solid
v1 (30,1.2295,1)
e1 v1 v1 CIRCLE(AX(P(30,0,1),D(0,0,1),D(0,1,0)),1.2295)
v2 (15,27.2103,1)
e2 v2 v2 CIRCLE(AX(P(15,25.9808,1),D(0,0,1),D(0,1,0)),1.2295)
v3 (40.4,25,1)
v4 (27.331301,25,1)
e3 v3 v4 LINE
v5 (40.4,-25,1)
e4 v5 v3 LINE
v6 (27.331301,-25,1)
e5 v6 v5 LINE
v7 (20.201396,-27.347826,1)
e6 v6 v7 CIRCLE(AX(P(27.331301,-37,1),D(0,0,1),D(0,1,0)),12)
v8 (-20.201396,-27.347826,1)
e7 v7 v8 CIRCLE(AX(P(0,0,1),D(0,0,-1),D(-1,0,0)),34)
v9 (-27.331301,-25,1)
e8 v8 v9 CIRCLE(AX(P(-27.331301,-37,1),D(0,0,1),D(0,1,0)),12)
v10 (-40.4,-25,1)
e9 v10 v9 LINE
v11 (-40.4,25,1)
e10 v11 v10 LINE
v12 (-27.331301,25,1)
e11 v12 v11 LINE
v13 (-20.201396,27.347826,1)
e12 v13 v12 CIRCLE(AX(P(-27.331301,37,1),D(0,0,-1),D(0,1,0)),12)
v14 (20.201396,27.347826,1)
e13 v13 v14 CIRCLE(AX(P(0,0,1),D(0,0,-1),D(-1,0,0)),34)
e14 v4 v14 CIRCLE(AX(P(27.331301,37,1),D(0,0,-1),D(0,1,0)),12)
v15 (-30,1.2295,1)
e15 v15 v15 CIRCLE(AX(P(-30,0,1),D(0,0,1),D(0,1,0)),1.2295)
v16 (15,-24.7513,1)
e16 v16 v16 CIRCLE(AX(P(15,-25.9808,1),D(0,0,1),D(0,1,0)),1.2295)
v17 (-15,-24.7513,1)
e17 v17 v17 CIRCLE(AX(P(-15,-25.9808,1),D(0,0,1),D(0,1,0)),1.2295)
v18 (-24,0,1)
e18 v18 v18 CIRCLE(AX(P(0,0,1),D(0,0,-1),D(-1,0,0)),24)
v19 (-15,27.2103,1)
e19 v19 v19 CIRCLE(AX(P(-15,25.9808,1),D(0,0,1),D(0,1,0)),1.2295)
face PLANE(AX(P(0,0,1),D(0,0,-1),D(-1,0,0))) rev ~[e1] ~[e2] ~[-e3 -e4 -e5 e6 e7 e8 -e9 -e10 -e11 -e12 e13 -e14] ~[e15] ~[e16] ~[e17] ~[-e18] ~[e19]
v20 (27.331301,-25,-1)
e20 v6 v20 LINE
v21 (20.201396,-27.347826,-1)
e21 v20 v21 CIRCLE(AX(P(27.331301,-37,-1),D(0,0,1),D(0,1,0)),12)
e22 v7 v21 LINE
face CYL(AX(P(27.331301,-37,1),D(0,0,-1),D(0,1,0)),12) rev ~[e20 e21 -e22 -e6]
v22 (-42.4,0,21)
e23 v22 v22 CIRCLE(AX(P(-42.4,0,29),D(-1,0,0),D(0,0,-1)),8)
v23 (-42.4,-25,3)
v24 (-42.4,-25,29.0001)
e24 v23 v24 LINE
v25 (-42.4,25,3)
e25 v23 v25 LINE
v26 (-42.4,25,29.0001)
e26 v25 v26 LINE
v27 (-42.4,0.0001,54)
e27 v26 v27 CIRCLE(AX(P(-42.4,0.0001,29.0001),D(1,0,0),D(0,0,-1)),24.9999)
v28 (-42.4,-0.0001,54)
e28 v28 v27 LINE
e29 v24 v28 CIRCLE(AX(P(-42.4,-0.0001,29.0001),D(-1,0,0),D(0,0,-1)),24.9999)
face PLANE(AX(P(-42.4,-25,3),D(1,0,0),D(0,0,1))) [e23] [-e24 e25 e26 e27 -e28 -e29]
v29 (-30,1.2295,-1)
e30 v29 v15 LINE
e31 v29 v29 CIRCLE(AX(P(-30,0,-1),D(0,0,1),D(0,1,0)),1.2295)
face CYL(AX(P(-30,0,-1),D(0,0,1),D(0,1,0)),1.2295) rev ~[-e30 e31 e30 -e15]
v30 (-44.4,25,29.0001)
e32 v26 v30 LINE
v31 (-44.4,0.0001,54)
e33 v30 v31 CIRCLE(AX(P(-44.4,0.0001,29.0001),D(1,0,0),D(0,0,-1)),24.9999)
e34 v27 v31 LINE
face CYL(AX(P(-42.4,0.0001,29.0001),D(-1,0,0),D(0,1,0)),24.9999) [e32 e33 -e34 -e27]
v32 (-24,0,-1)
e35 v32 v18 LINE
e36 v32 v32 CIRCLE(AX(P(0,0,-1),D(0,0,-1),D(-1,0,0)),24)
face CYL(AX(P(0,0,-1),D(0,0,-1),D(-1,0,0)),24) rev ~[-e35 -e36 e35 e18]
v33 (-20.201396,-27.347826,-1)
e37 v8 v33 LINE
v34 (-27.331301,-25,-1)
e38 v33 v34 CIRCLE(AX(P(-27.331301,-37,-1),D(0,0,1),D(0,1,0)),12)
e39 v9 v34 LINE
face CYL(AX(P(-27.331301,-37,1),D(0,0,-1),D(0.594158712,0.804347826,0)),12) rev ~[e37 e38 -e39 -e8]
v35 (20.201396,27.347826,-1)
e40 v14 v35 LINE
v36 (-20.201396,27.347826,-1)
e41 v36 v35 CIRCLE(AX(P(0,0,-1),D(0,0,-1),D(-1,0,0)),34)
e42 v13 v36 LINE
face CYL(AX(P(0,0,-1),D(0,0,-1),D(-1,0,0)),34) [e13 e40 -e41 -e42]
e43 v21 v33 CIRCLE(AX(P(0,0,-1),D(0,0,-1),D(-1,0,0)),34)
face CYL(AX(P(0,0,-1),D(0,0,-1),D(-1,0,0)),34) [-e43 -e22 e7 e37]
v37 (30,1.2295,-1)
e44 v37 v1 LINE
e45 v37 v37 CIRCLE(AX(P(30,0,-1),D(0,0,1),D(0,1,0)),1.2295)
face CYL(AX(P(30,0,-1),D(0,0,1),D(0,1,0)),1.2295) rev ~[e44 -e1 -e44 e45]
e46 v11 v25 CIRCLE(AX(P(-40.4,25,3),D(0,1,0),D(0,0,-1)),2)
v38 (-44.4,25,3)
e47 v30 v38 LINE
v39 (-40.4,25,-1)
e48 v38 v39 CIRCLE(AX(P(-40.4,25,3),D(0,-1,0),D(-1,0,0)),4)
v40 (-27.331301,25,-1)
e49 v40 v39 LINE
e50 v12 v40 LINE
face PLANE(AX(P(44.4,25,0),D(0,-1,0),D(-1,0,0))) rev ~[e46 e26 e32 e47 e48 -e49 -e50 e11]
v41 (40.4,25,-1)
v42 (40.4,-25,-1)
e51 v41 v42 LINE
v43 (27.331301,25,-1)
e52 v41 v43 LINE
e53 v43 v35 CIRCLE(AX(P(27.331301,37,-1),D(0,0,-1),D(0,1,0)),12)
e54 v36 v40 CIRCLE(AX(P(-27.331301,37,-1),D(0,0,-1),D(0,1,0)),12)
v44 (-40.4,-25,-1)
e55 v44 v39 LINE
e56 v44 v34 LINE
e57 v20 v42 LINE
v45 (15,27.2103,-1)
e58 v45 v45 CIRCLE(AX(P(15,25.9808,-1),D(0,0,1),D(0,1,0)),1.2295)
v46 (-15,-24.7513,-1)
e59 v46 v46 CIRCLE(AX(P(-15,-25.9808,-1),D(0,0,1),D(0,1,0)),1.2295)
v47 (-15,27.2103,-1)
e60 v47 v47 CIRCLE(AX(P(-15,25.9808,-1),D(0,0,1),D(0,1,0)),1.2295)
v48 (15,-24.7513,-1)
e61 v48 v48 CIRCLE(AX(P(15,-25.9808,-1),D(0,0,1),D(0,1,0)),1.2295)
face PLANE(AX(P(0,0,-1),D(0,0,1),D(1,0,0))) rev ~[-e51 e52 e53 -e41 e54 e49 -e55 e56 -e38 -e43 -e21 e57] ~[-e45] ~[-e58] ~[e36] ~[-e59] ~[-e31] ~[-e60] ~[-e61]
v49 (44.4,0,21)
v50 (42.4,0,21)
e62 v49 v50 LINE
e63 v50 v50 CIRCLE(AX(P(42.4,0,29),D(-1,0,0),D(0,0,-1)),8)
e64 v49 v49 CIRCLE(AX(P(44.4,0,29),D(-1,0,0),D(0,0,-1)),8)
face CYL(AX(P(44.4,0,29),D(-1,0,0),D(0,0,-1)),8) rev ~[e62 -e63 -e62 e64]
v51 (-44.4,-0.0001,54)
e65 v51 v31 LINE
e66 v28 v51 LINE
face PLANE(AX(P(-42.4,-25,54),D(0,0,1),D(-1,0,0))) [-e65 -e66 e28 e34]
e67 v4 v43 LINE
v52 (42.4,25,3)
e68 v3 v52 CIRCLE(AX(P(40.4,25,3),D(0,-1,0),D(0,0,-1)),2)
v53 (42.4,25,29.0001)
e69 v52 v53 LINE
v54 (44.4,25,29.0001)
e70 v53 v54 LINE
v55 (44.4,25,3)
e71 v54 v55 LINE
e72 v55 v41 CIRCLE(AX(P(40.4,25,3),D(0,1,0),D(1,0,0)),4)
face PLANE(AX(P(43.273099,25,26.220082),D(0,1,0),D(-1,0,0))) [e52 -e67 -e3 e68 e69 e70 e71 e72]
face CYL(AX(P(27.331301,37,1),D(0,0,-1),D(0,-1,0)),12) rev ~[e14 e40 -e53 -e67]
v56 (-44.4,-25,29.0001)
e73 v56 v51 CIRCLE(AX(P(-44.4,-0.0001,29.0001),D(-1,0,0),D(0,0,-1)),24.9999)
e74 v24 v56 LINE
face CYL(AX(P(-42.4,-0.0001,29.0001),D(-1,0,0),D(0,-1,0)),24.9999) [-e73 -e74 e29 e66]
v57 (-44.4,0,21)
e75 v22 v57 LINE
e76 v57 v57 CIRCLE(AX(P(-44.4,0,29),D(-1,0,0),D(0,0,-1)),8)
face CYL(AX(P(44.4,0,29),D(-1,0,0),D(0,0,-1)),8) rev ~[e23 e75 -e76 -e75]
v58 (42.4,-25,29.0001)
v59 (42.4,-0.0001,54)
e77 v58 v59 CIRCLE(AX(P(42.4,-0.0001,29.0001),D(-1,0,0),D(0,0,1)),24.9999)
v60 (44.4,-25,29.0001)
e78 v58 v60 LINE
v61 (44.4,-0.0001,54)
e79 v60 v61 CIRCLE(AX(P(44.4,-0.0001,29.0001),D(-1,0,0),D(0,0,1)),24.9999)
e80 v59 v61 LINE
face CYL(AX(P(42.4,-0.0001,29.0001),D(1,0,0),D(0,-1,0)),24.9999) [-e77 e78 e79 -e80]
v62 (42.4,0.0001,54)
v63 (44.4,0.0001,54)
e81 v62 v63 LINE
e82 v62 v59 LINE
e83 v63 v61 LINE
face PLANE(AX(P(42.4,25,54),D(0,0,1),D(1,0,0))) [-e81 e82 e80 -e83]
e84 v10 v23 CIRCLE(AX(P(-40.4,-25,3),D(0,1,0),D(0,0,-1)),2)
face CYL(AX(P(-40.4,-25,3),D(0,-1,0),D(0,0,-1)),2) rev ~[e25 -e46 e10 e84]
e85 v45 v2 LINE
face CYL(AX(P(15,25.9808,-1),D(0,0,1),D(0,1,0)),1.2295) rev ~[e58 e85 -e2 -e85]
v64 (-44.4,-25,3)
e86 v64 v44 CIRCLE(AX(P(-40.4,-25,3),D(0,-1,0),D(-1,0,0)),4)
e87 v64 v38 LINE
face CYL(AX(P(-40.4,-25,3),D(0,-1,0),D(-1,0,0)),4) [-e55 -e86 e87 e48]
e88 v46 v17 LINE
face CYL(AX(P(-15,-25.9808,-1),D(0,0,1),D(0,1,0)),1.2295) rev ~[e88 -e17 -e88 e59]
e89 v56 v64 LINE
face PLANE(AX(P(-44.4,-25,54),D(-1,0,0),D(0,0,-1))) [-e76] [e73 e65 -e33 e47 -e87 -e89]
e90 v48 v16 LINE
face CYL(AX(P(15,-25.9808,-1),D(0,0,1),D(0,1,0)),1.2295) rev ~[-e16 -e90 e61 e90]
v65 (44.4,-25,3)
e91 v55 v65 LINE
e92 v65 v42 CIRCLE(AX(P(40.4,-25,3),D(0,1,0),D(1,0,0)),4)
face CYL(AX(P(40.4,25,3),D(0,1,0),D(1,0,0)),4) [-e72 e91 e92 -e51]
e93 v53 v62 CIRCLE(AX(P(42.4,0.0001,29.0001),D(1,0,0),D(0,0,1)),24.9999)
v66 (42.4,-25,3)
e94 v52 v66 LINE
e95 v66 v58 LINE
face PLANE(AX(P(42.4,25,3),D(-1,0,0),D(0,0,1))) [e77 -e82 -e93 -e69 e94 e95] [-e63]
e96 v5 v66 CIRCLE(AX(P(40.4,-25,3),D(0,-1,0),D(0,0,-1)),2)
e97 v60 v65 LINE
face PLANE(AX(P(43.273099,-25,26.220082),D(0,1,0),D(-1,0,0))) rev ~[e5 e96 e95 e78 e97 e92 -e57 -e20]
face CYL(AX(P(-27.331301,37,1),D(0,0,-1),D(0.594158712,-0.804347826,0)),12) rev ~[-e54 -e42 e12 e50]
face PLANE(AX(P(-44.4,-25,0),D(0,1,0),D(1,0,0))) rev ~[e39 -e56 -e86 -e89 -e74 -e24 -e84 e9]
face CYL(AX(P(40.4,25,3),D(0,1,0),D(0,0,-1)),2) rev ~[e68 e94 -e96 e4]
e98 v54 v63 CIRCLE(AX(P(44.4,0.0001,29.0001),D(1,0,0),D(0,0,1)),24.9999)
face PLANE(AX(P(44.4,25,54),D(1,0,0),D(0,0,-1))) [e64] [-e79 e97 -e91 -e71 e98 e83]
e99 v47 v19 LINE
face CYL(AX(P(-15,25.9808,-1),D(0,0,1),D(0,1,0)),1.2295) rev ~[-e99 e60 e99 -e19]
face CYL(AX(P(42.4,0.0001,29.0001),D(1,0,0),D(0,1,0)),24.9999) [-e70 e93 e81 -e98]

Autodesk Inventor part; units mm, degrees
ref_plane "YZ Plane" through (0, 0, 0) normal (1, 0, 0) x (0, 1, 0)
ref_plane "XZ Plane" through (0, 0, 0) normal (0, 1, 0) x (-1, 0, 0)
ref_plane "XY Plane" through (0, 0, 0) normal (0, 0, 1) x (1, 0, 0)
sketch "スケッチ1" plane through (0, 0, 0) normal (0, 0, 1) x (1, 0, 0)
  line L0 (44.4, 25) -> (-44.4, 25)
  line L1 (-44.4, 25) -> (-44.4, -25)
  line L2 (-44.4, -25) -> (44.4, -25)
  line L3 (44.4, -25) -> (44.4, 25)
  line L4 (44.4, 25) -> (-44.4, -25) construction
  line L5 (-44.4, 25) -> (44.4, -25) construction
  point P0 (0, 0)
  dimension "d0" = 50
  dimension "d1" = 88.8
extrude "プレート1" add sketch "スケッチ1" along normal mid plane 2
sketch "スケッチ6" plane through (0, 0, -1) normal (0, 0, -1) x (-1, 0, 0)
  circle A0 centre (0, 0) radius 34
  dimension "d48" = 68
extrude "押し出し2" add sketch "スケッチ6" against normal up to surface (2 mm away)
sketch "スケッチ2" plane through (42.4, 25, -1) normal (1, 0, 0) x (0, 1, 0)
  line L0 (-50, 0) -> (0, 0)
  line L1 (0, 0) -> (0, 55)
  line L2 (0, 55) -> (-50, 55)
  line L3 (-50, 55) -> (-50, 0)
edge flange "フランジ1" height 55 angle 90 thickness 2 bend radius 2 thickness toward (1, 0, 0) relief tear relief width 2 relief depth 1 corner gap 2 corner form 0 edges at (44.4, 0, 1) (-44.4, 0, 1) wall of the first edge with corners at (42.4, -25, -1) (42.4, 25, -1) (42.4, 25, 54) (42.4, -25, 54)
bend "曲げ1"
corner "コーナー1"
fillet "フィレット1" radius 25 4 edges at (43.4, 25, 54) (-43.4, 25, 54) (-43.4, -25, 54) (43.4, -25, 54)
sketch "スケッチ3" plane through (44.4, -25, 3) normal (1, 0, 0) x (0, 0, -1)
  arc A0 (-26, 50) -> (-26, 0) centre (-26, 25) ccw projected
  point P0 (3, 25)
  point P1 (-26, 25)
  point P2 (-38, 25)
  point P3 (-26, 13)
  point P4 (-14, 25)
  point P5 (-26, 37)
  dimension "d24" = 360
  dimension "d52" = 12
hole "穴1" at (44.4, 0, 29) direction (-1, 0, 0) diameter 16 end through all
sketch "スケッチ4" plane through (0, 0, -1) normal (0, 0, -1) x (-1, 0, 0)
  circle A0 centre (0, 0) radius 24
  dimension "d33" = 48
extrude "押し出し1" cut sketch "スケッチ4" against normal through all
sketch "スケッチ5" plane through (0, 0, -1) normal (0, 0, -1) x (-1, 0, 0)
  point P0 (0, 0)
  point P1 (-30, 0)
  point P2 (-15, -25.9808)
  point P3 (15, -25.9808)
  point P4 (30, 0)
  point P5 (15, 25.9808)
  point P6 (-15, 25.9808)
  dimension "d36" = 30
  dimension "d39" = 360
hole "穴3" at (30, 0, -1) at (15, -25.9808, -1) at (-15, -25.9808, -1) at (-30, 0, -1) at (-15, 25.9808, -1) at (15, 25.9808, -1) direction (0, 0, 1) diameter 2.459 end through all thread size "M3x0.5" class "6H" standard "ANSI Metric M Profile"
fillet "コーナーR1" radius 12 4 edges at (23.0434, 25, 0) (-23.0434, 25, 0) (23.0434, -25, 0) (-23.0434, -25, 0)
equation "\"d13\" = 0.5 * d0"
equation "\"d46\" = Thickness"
equation "\"d2\" = Thickness"
equation "\"d3\" = BendReliefWidth"
equation "\"d4\" = BendReliefDepth"
equation "\"d5\" = MinimumRemnant"
equation "\"d6\" = TransitionRadius"
equation "\"d9\" = BendRadius"
equation "\"d10\" = CornerReliefSize"
equation "\"d11\" = GapSize"
equation "\"d12\" = JacobiRadiusSize"
equation "\"BendRadius\" = Thickness"
equation "\"BendReliefWidth\" = Thickness"
equation "\"BendReliefDepth\" = 0.5 * Thickness"
equation "\"CornerReliefSize\" = 4 * Thickness"
equation "\"MinimumRemnant\" = 2 * Thickness"
equation "\"TransitionRadius\" = BendRadius"
equation "\"JacobiRadiusSize\" = BendRadius"
equation "\"GapSize\" = Thickness"
equation "\"Thickness\" = 2"
properties part number "edge_j4-5" material "アルミニウム 6061"
